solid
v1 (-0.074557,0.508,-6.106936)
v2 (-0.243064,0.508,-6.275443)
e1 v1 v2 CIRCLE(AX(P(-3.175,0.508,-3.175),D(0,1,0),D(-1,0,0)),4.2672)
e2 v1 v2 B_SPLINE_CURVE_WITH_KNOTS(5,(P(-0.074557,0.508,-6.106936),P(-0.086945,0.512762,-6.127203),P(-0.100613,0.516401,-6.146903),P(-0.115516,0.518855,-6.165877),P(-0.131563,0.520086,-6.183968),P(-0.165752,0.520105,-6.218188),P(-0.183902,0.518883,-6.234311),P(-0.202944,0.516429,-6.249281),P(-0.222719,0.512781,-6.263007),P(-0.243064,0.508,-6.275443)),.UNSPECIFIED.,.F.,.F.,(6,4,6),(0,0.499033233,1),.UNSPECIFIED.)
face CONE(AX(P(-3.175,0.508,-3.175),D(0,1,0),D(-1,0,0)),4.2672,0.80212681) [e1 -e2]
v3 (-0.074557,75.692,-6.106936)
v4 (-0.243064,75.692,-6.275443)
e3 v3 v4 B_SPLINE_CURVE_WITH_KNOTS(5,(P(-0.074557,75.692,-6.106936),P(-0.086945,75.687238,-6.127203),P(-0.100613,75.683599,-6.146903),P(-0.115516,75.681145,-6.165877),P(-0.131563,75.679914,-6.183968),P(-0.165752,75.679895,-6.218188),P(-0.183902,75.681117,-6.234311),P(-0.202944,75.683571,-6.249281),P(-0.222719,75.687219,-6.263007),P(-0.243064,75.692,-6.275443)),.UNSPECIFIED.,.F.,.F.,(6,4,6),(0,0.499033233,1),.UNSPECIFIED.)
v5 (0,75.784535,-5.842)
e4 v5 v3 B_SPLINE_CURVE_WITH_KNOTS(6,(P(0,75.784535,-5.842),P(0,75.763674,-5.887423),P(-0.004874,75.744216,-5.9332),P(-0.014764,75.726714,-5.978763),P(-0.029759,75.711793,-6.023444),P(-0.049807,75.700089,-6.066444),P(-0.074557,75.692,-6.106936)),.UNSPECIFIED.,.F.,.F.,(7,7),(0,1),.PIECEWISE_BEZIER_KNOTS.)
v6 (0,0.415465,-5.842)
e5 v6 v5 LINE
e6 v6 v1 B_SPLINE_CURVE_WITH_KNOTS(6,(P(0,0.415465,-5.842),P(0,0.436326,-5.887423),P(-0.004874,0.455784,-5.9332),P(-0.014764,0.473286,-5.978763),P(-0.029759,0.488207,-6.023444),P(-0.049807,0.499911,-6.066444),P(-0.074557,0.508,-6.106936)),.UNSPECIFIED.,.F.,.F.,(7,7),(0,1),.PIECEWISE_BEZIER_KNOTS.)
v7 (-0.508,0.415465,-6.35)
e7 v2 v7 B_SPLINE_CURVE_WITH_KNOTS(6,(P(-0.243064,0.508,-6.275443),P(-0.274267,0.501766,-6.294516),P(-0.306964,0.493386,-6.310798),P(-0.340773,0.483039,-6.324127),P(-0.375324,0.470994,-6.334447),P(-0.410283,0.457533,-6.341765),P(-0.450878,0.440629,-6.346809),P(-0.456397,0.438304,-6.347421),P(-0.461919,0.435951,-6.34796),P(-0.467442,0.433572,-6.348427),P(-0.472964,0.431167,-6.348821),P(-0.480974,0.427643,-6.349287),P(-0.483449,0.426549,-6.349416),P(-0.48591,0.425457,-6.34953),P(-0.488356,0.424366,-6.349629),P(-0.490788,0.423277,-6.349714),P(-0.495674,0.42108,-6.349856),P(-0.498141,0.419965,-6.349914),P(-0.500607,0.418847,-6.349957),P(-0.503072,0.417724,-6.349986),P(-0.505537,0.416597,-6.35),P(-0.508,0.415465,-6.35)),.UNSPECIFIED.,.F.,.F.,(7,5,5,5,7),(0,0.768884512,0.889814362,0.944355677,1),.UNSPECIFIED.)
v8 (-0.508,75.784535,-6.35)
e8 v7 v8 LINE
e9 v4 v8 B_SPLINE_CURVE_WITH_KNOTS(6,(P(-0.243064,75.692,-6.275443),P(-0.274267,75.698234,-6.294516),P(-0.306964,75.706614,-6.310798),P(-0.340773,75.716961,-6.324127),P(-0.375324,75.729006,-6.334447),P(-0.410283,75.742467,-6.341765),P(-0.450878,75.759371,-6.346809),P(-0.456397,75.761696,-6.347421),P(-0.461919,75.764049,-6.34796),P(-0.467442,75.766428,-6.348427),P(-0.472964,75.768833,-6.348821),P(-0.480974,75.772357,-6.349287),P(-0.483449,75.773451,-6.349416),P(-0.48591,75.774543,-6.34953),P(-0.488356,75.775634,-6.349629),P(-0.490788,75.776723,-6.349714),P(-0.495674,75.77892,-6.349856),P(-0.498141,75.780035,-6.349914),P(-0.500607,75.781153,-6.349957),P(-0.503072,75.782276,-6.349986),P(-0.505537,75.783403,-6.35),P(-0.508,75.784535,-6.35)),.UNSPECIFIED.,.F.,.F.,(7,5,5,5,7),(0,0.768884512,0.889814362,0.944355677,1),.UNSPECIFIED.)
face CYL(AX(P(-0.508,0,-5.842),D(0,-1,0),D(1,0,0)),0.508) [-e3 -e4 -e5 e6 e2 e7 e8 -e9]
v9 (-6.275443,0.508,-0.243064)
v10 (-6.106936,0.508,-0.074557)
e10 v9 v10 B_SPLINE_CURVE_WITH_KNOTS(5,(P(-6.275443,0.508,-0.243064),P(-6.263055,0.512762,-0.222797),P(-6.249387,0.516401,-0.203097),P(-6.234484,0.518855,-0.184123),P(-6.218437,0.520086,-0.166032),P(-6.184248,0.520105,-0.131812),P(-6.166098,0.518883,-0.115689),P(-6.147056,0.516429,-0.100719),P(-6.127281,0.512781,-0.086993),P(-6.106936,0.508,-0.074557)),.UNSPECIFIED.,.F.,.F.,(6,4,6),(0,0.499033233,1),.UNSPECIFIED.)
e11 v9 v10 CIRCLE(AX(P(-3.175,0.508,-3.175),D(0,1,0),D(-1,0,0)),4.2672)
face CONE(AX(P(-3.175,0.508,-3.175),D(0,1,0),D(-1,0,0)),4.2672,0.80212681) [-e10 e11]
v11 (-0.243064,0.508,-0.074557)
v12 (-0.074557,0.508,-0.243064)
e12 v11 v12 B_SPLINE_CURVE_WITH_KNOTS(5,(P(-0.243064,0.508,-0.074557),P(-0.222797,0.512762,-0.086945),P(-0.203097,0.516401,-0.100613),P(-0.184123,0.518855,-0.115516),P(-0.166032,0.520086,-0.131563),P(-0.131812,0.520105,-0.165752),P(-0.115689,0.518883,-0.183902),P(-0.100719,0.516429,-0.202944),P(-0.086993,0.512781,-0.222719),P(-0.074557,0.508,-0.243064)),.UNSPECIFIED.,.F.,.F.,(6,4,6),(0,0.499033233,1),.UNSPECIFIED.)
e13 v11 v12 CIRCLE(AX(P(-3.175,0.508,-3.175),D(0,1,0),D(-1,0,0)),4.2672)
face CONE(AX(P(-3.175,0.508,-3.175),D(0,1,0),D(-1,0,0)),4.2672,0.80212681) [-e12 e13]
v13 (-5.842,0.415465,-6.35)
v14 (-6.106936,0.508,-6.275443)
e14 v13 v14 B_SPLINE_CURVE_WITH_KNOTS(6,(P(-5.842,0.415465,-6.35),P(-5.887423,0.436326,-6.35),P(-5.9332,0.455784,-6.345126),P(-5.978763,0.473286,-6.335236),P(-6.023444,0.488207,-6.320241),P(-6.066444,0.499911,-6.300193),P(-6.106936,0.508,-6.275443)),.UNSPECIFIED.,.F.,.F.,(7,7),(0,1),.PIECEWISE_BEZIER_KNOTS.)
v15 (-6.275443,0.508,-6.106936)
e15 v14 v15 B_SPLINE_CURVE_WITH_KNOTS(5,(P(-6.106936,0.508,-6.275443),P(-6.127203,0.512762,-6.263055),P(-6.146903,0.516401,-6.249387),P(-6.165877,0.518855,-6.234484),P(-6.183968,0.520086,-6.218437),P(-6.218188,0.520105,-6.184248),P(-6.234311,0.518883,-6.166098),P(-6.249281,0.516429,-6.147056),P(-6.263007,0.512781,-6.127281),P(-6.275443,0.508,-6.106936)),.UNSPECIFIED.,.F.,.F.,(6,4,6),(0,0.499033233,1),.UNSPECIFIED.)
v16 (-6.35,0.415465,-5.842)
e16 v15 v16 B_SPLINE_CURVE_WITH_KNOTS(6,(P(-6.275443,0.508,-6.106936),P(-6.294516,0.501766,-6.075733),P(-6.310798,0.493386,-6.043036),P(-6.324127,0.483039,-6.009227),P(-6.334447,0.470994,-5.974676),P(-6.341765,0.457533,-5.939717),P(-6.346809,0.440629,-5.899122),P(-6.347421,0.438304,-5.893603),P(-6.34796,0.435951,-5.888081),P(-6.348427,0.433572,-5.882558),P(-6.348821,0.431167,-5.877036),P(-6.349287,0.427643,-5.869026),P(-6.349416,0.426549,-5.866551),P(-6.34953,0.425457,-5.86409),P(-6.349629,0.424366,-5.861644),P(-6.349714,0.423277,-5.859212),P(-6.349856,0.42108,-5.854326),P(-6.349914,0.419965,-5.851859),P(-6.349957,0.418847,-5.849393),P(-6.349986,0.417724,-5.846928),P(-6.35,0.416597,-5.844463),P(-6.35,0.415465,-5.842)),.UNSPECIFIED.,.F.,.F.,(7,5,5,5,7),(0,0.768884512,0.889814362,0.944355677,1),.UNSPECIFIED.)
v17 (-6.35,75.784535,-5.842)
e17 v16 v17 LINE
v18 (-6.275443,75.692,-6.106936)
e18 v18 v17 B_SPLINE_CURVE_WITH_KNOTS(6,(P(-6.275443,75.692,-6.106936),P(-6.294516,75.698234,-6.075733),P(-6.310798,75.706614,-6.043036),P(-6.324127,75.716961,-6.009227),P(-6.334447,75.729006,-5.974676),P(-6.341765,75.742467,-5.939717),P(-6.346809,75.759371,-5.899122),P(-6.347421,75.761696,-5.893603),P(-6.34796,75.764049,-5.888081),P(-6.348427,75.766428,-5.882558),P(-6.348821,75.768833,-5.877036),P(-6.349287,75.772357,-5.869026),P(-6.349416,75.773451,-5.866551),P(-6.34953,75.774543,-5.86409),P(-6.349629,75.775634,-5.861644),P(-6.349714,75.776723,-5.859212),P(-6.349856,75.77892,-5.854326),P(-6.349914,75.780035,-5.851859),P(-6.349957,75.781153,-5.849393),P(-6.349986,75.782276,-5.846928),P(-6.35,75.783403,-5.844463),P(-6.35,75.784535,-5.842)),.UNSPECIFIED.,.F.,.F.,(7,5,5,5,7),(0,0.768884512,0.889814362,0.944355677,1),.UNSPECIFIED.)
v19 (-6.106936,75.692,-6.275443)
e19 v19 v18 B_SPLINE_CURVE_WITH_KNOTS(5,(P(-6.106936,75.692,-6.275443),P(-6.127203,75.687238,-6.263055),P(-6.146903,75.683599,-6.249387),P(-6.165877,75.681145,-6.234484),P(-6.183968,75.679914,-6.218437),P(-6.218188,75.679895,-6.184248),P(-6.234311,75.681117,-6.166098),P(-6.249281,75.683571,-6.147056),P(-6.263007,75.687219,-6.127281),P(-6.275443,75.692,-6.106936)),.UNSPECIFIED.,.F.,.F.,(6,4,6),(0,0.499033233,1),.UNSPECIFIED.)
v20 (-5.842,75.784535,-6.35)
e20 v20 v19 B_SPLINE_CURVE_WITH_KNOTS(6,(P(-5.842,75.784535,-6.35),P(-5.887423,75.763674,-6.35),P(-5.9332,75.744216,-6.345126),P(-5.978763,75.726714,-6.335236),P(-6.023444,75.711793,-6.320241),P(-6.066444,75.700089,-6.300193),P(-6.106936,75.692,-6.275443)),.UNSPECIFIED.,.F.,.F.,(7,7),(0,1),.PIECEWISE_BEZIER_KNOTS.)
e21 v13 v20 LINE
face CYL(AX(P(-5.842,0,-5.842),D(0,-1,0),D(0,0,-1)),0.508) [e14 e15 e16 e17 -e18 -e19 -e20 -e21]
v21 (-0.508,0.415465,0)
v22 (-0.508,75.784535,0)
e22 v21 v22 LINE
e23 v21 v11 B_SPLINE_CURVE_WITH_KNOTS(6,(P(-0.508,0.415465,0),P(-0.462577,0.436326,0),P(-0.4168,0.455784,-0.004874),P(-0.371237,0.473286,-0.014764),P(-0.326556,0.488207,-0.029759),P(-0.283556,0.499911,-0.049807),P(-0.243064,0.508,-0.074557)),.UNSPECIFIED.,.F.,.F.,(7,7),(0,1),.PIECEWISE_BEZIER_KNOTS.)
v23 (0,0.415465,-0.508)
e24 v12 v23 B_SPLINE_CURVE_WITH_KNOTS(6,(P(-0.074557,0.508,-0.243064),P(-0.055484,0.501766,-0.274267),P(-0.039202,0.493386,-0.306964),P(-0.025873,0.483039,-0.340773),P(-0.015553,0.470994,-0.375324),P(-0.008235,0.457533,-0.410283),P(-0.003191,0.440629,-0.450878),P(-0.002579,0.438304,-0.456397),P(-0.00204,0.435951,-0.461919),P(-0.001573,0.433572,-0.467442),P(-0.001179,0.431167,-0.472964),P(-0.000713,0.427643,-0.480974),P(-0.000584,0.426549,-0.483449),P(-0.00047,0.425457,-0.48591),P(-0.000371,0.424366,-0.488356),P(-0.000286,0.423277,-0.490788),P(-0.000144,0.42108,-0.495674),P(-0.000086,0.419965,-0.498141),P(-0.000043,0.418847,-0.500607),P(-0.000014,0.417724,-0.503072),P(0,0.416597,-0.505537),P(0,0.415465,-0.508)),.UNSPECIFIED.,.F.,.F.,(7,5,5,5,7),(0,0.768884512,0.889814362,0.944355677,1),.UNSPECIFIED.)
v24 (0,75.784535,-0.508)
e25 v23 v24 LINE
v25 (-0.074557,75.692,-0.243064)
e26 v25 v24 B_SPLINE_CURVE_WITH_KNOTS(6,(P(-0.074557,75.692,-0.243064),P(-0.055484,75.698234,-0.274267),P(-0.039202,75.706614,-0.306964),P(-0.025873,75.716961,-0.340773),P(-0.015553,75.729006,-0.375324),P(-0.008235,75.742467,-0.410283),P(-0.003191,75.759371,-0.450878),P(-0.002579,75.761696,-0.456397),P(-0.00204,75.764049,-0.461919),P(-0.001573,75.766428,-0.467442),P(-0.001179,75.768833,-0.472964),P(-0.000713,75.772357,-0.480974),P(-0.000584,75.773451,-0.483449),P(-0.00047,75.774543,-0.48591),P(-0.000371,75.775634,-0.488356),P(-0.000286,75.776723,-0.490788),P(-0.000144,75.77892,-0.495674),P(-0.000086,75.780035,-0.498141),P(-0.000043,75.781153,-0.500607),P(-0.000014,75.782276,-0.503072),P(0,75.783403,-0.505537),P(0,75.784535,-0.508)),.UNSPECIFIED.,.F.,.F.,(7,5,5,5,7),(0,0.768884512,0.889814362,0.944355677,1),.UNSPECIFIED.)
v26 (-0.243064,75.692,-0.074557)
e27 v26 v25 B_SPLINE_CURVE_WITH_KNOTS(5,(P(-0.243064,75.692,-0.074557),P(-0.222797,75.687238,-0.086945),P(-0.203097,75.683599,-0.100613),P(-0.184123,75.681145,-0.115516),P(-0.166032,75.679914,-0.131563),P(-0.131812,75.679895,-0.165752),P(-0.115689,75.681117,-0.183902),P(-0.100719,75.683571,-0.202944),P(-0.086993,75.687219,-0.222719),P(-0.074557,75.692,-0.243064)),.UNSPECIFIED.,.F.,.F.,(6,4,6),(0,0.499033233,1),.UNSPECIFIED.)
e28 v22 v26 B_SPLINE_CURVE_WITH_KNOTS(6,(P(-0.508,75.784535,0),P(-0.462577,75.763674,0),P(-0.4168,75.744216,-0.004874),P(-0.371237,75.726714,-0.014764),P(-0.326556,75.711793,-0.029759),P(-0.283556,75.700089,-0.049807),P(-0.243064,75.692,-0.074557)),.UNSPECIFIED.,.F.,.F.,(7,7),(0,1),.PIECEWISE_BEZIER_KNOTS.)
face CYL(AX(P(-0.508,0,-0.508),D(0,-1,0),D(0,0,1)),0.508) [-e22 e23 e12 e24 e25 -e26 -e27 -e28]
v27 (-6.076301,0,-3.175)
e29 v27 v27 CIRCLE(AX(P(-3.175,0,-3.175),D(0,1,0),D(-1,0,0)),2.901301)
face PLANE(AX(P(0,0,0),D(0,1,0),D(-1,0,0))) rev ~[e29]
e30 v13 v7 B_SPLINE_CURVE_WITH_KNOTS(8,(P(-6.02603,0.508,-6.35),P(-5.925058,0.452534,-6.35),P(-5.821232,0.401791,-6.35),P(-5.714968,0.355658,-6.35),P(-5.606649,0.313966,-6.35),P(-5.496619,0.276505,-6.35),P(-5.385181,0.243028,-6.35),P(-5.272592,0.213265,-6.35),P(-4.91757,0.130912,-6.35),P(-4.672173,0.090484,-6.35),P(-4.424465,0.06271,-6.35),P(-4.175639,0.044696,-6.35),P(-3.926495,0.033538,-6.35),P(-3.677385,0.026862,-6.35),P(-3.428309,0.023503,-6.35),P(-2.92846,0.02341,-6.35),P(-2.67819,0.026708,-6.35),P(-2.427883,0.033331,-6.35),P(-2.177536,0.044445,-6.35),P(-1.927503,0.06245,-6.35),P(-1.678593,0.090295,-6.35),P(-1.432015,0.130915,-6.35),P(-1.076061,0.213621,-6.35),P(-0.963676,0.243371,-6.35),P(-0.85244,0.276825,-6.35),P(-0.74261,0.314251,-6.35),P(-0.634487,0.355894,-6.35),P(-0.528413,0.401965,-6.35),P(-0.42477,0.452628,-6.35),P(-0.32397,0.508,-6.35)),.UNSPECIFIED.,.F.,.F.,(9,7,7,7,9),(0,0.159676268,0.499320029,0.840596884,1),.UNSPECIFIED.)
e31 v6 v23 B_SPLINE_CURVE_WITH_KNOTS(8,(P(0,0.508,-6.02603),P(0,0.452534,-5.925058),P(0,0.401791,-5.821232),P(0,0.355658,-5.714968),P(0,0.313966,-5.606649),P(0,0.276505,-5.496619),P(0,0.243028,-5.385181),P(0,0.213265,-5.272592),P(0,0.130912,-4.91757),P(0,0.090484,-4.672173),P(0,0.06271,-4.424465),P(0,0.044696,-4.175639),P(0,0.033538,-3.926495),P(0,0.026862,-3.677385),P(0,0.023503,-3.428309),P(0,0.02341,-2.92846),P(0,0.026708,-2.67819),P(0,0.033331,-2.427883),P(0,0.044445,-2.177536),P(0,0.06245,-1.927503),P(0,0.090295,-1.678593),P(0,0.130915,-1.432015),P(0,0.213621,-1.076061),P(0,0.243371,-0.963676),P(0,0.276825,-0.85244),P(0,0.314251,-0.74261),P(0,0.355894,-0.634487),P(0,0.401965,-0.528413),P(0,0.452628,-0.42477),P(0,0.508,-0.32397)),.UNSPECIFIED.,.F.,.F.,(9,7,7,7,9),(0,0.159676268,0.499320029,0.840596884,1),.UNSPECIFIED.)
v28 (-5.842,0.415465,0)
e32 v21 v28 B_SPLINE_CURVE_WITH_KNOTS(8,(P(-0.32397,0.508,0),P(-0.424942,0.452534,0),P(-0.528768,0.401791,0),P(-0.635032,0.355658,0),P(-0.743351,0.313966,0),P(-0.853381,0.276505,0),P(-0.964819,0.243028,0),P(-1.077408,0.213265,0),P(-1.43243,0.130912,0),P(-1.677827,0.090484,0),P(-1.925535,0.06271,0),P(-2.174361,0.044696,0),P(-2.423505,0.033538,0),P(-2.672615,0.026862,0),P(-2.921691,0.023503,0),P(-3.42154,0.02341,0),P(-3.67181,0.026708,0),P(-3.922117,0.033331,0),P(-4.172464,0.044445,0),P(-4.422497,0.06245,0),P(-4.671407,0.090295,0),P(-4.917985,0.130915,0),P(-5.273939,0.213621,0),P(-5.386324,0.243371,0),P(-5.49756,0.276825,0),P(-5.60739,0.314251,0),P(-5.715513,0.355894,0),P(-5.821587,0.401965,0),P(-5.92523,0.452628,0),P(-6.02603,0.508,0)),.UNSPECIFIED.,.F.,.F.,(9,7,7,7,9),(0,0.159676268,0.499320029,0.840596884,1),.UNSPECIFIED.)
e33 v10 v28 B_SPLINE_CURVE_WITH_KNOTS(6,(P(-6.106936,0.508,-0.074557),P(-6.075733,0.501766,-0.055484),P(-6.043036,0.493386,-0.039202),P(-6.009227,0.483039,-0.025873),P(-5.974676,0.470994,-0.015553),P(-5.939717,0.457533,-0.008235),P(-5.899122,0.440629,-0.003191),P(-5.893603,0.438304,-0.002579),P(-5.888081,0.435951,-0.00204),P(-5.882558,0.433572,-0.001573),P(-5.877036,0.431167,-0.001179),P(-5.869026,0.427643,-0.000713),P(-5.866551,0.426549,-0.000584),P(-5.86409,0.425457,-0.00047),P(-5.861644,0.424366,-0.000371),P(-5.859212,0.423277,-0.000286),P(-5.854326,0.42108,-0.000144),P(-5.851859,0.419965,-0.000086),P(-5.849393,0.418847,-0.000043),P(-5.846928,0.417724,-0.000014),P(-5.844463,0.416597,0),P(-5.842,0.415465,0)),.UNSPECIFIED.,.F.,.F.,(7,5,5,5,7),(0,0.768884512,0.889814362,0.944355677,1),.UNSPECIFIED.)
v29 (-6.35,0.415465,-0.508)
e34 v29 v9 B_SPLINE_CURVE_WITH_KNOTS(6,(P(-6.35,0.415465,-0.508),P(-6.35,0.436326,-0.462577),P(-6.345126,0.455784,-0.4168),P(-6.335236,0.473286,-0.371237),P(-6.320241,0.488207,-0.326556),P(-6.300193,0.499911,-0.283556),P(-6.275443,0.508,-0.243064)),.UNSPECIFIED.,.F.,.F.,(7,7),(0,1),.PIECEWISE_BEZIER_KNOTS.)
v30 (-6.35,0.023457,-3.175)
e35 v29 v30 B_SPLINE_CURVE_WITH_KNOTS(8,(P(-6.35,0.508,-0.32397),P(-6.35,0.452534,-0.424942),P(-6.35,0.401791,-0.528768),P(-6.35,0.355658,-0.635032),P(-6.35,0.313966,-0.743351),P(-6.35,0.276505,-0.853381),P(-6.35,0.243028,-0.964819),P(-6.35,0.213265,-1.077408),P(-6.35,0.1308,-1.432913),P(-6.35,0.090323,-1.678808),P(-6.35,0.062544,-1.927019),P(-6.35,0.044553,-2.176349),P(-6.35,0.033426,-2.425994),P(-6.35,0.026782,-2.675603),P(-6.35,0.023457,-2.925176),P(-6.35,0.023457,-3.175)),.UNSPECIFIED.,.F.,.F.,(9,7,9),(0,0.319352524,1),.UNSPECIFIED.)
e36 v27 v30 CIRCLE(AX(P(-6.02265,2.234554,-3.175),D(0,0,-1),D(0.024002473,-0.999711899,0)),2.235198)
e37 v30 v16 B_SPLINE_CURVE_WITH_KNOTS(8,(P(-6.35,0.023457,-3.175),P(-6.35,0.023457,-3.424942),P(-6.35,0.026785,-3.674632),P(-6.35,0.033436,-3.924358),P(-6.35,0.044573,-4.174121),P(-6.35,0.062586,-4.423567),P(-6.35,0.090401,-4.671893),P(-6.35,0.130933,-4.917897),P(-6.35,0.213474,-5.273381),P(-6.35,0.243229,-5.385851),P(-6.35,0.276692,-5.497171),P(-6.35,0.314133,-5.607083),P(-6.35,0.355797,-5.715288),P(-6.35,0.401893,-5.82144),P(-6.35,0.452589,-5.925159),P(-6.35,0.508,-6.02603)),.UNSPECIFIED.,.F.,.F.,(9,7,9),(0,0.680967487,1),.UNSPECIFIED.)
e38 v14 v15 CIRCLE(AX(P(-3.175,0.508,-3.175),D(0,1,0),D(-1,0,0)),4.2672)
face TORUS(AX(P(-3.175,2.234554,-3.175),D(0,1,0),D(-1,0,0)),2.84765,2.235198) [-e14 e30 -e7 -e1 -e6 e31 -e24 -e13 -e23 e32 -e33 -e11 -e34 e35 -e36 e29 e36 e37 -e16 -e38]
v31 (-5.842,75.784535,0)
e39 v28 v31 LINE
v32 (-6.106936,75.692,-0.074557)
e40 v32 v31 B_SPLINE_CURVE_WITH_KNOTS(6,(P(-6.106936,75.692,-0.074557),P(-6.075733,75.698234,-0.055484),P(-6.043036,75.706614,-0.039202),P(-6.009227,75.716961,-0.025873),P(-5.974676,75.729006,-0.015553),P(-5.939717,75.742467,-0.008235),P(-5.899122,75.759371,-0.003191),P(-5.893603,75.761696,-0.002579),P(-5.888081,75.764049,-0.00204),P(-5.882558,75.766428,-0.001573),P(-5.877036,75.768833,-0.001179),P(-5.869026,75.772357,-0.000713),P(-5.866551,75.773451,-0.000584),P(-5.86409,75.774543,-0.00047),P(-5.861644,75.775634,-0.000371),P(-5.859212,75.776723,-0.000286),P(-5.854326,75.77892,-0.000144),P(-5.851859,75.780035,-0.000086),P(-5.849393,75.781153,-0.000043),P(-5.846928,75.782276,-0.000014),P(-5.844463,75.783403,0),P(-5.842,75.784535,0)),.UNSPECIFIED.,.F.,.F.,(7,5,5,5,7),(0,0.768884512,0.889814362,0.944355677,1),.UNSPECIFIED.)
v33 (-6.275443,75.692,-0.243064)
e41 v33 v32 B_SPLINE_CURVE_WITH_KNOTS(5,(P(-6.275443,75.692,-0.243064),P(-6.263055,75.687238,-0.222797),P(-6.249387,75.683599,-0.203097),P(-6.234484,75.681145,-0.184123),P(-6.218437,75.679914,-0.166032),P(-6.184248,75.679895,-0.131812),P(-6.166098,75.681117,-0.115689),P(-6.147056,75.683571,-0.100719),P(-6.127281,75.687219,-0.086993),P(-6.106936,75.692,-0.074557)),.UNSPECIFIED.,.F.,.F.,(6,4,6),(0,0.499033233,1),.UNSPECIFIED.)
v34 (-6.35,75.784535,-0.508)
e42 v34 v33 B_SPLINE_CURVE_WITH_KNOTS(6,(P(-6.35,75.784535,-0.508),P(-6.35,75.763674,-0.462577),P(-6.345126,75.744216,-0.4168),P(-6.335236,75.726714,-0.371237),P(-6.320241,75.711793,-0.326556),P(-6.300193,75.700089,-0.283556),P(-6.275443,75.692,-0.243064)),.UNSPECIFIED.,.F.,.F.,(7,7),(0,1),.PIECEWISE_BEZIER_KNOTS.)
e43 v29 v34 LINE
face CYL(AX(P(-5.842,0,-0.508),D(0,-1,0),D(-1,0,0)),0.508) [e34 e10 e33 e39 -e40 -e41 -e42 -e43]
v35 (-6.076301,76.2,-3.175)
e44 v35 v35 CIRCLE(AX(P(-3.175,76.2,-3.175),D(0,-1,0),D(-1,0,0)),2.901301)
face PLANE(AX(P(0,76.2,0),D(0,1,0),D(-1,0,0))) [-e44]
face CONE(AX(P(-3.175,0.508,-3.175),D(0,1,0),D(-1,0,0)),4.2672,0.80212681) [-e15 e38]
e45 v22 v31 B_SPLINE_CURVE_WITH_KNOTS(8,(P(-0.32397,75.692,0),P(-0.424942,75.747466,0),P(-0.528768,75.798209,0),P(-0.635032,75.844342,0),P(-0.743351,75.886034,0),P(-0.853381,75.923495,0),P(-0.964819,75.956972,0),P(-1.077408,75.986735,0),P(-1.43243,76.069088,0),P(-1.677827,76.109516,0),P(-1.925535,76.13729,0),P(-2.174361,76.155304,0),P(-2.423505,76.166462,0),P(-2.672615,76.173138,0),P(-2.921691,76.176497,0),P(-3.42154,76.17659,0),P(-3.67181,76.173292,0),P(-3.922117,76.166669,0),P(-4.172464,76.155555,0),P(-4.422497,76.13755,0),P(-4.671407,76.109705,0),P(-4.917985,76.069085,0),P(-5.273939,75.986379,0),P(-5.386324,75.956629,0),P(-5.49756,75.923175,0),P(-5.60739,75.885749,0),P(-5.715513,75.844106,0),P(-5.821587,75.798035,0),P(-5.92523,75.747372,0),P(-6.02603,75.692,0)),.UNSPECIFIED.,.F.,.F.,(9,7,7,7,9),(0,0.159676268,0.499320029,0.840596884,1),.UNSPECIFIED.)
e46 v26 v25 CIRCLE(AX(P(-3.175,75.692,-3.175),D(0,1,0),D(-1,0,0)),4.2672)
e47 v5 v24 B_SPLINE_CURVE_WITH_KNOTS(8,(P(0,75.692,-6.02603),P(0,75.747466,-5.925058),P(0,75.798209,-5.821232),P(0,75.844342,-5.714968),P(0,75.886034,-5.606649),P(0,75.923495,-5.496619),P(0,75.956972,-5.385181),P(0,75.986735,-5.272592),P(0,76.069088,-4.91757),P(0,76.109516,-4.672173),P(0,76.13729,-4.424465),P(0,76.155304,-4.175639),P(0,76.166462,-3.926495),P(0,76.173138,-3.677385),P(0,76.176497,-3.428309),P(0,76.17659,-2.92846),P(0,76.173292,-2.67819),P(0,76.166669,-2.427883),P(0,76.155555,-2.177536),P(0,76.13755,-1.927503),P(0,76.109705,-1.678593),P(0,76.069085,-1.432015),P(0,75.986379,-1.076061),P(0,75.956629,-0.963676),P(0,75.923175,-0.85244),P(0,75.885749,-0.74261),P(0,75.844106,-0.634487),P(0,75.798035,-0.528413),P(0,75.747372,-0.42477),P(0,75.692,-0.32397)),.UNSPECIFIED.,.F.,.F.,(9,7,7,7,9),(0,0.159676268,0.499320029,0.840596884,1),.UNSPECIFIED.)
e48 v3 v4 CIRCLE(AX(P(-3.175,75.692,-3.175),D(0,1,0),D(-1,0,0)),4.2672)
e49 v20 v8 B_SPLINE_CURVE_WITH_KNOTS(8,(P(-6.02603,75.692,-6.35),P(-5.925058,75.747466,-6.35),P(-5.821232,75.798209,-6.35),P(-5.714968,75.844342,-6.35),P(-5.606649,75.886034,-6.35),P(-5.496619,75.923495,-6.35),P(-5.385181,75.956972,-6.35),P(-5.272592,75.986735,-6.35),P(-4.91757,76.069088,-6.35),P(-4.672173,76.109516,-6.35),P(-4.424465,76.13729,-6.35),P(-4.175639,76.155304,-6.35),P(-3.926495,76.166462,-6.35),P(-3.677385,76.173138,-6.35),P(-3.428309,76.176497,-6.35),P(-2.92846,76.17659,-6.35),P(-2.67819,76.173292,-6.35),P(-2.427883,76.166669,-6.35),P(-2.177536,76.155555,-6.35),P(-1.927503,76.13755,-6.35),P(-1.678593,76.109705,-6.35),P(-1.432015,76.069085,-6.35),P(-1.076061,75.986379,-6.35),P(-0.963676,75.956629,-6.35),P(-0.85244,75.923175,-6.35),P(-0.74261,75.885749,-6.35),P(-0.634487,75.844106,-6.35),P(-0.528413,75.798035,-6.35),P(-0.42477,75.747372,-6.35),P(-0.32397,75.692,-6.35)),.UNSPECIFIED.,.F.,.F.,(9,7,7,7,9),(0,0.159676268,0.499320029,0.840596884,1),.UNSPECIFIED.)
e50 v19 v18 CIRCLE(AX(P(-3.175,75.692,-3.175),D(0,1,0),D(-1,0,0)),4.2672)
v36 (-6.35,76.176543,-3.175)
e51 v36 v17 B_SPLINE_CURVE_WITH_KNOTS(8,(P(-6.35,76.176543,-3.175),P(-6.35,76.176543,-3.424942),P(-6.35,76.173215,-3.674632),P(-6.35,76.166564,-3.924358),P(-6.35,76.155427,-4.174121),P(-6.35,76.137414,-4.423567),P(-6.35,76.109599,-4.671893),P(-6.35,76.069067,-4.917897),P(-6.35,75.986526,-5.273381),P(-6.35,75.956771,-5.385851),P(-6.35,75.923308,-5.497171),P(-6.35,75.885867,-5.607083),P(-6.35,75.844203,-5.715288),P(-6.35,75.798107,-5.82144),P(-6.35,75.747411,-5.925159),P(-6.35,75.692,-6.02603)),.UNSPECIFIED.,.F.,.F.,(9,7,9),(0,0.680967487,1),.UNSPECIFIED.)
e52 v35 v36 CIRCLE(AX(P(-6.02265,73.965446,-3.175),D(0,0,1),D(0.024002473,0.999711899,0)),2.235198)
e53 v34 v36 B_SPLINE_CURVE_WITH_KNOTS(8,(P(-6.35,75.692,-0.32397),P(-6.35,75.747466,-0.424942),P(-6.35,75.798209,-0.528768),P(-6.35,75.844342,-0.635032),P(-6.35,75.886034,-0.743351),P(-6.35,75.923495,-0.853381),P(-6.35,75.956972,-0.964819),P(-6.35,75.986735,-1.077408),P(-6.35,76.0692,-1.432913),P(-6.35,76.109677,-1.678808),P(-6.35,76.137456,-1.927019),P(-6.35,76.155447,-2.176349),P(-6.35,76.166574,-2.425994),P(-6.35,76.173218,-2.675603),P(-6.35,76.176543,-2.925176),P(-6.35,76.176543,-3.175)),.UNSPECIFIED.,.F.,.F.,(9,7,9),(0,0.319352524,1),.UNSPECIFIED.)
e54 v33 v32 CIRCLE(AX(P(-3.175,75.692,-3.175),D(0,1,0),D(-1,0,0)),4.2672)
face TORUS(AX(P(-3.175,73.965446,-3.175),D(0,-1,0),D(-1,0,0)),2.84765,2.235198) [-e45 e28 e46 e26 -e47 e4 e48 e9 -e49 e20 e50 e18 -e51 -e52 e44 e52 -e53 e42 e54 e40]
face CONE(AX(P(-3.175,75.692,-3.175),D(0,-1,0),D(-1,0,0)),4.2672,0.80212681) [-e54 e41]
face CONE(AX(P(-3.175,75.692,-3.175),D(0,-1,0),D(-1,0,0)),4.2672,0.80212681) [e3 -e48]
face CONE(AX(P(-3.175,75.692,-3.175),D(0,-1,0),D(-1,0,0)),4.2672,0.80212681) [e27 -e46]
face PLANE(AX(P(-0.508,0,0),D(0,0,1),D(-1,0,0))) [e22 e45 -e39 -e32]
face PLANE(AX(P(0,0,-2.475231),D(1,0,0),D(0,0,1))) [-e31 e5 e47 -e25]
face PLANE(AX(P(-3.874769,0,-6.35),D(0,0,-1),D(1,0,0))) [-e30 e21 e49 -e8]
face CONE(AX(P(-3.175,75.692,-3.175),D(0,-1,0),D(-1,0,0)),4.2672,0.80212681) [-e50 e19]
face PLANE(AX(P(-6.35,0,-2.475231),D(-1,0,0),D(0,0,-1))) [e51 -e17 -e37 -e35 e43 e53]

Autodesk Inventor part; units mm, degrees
ref_plane "YZ Plane" through (0, 0, 0) normal (1, 0, 0) x (0, 1, 0)
sketch "Sketch1" plane through (0, 0, 0) normal (0, 1, 0) x (-1, 0, 0)
  line L0 (0.508, 0) -> (5.842, 0)
  line L1 (6.35, -0.508) -> (6.35, -5.842)
  line L2 (5.842, -6.35) -> (0.508, -6.35)
  line L3 (0, -5.842) -> (0, -0.508)
  arc A0 (5.842, -6.35) -> (6.35, -5.842) centre (5.842, -5.842) ccw
  arc A1 (0, -5.842) -> (0.508, -6.35) centre (0.508, -5.842) ccw
  arc A2 (0.508, 0) -> (0, -0.508) centre (0.508, -0.508) ccw
  arc A3 (6.35, -0.508) -> (5.842, 0) centre (5.842, -0.508) ccw
  arc A4 (3.874769, -6.35) -> (6.35, -3.874769) centre (3.175, -3.175) ccw
  arc A5 (0, -3.874769) -> (2.475231, -6.35) centre (3.175, -3.175) ccw
  arc A6 (6.35, -2.475231) -> (3.874769, 0) centre (3.175, -3.175) ccw
  arc A7 (2.475231, 0) -> (0, -2.475231) centre (3.175, -3.175) ccw
  point P0 (0, 0)
  point P1 (6.35, -6.35)
  point P2 (6.35, 0)
  point P3 (0, -6.35)
  dimension "d0" = 6.35
  dimension "d1" = 6.35
  dimension "d2" = 0.508
extrude "Extrusion1" add sketch "Sketch1" along normal blind 76.2
ref_plane "Work Plane1" through (-0.508, 0, -3.175) normal (0, 0, -1) x (-1, 0, 0)
sketch "Sketch2" plane through (-0.508, 0, -3.175) normal (0, 0, -1) x (-1, 0, 0)
  line L0 (-0.508, 0) -> (-0.508, 76.2)
  line L1 (-0.508, 76.2) -> (5.842, 76.2)
  line L2 (5.842, 76.2) -> (5.842, 0)
  line L3 (5.842, 0) -> (-0.508, 0)
  line L4 (2.667, 76.2) -> (2.667, 76.9112)
  line L5 (2.667, 76.9112) -> (6.9342, 76.9112)
  line L6 (2.667, 76.2) -> (5.461, 76.2)
  arc A0 (6.9342, 75.692) -> (5.461, 76.2) centre (5.51465, 73.965444) ccw
  line L7 (6.9342, 76.9112) -> (7.192755, 76.9112)
  line L8 (7.192755, 76.9112) -> (7.192755, 75.441954)
  line L9 (7.192755, 75.441954) -> (6.9342, 75.692)
  dimension "d6" = 0.7112
  dimension "d7" = 4.2672
  dimension "d8" = 1.2192
  dimension "d9" = 2.794
  dimension "d10" = 2.2352
sketch "Sketch2 outline for Revolution1" plane through (-0.508, 0, -3.175) normal (0, 0, -1) x (-1, 0, 0)
  line L0 (2.667, 76.2) -> (5.461, 76.2)
  line L1 (2.667, 76.9112) -> (2.667, 76.2)
  line L2 (6.9342, 76.9112) -> (2.667, 76.9112)
  line L3 (7.192755, 76.9112) -> (6.9342, 76.9112)
  line L4 (7.192755, 75.441954) -> (7.192755, 76.9112)
  line L5 (6.9342, 75.692) -> (7.192755, 75.441954)
  arc A0 (5.461, 76.2) -> (6.9342, 75.692) centre (5.51465, 73.965444) cw
revolve "Revolution1" cut sketch "Sketch2 outline for Revolution1" angle 360 about axis through (-3.175, 76.2, -3.175) along (0, 1, 0)
ref_plane "Work Plane2" through (-3.175, 38.1, -3.175) normal (0, 1, 0) x (1, 0, 0)
mirror "Mirror1" about plane through (-3.175, 38.1, -3.175) normal (0, 1, 0) of "Revolution1"
properties part number "276-3522"
